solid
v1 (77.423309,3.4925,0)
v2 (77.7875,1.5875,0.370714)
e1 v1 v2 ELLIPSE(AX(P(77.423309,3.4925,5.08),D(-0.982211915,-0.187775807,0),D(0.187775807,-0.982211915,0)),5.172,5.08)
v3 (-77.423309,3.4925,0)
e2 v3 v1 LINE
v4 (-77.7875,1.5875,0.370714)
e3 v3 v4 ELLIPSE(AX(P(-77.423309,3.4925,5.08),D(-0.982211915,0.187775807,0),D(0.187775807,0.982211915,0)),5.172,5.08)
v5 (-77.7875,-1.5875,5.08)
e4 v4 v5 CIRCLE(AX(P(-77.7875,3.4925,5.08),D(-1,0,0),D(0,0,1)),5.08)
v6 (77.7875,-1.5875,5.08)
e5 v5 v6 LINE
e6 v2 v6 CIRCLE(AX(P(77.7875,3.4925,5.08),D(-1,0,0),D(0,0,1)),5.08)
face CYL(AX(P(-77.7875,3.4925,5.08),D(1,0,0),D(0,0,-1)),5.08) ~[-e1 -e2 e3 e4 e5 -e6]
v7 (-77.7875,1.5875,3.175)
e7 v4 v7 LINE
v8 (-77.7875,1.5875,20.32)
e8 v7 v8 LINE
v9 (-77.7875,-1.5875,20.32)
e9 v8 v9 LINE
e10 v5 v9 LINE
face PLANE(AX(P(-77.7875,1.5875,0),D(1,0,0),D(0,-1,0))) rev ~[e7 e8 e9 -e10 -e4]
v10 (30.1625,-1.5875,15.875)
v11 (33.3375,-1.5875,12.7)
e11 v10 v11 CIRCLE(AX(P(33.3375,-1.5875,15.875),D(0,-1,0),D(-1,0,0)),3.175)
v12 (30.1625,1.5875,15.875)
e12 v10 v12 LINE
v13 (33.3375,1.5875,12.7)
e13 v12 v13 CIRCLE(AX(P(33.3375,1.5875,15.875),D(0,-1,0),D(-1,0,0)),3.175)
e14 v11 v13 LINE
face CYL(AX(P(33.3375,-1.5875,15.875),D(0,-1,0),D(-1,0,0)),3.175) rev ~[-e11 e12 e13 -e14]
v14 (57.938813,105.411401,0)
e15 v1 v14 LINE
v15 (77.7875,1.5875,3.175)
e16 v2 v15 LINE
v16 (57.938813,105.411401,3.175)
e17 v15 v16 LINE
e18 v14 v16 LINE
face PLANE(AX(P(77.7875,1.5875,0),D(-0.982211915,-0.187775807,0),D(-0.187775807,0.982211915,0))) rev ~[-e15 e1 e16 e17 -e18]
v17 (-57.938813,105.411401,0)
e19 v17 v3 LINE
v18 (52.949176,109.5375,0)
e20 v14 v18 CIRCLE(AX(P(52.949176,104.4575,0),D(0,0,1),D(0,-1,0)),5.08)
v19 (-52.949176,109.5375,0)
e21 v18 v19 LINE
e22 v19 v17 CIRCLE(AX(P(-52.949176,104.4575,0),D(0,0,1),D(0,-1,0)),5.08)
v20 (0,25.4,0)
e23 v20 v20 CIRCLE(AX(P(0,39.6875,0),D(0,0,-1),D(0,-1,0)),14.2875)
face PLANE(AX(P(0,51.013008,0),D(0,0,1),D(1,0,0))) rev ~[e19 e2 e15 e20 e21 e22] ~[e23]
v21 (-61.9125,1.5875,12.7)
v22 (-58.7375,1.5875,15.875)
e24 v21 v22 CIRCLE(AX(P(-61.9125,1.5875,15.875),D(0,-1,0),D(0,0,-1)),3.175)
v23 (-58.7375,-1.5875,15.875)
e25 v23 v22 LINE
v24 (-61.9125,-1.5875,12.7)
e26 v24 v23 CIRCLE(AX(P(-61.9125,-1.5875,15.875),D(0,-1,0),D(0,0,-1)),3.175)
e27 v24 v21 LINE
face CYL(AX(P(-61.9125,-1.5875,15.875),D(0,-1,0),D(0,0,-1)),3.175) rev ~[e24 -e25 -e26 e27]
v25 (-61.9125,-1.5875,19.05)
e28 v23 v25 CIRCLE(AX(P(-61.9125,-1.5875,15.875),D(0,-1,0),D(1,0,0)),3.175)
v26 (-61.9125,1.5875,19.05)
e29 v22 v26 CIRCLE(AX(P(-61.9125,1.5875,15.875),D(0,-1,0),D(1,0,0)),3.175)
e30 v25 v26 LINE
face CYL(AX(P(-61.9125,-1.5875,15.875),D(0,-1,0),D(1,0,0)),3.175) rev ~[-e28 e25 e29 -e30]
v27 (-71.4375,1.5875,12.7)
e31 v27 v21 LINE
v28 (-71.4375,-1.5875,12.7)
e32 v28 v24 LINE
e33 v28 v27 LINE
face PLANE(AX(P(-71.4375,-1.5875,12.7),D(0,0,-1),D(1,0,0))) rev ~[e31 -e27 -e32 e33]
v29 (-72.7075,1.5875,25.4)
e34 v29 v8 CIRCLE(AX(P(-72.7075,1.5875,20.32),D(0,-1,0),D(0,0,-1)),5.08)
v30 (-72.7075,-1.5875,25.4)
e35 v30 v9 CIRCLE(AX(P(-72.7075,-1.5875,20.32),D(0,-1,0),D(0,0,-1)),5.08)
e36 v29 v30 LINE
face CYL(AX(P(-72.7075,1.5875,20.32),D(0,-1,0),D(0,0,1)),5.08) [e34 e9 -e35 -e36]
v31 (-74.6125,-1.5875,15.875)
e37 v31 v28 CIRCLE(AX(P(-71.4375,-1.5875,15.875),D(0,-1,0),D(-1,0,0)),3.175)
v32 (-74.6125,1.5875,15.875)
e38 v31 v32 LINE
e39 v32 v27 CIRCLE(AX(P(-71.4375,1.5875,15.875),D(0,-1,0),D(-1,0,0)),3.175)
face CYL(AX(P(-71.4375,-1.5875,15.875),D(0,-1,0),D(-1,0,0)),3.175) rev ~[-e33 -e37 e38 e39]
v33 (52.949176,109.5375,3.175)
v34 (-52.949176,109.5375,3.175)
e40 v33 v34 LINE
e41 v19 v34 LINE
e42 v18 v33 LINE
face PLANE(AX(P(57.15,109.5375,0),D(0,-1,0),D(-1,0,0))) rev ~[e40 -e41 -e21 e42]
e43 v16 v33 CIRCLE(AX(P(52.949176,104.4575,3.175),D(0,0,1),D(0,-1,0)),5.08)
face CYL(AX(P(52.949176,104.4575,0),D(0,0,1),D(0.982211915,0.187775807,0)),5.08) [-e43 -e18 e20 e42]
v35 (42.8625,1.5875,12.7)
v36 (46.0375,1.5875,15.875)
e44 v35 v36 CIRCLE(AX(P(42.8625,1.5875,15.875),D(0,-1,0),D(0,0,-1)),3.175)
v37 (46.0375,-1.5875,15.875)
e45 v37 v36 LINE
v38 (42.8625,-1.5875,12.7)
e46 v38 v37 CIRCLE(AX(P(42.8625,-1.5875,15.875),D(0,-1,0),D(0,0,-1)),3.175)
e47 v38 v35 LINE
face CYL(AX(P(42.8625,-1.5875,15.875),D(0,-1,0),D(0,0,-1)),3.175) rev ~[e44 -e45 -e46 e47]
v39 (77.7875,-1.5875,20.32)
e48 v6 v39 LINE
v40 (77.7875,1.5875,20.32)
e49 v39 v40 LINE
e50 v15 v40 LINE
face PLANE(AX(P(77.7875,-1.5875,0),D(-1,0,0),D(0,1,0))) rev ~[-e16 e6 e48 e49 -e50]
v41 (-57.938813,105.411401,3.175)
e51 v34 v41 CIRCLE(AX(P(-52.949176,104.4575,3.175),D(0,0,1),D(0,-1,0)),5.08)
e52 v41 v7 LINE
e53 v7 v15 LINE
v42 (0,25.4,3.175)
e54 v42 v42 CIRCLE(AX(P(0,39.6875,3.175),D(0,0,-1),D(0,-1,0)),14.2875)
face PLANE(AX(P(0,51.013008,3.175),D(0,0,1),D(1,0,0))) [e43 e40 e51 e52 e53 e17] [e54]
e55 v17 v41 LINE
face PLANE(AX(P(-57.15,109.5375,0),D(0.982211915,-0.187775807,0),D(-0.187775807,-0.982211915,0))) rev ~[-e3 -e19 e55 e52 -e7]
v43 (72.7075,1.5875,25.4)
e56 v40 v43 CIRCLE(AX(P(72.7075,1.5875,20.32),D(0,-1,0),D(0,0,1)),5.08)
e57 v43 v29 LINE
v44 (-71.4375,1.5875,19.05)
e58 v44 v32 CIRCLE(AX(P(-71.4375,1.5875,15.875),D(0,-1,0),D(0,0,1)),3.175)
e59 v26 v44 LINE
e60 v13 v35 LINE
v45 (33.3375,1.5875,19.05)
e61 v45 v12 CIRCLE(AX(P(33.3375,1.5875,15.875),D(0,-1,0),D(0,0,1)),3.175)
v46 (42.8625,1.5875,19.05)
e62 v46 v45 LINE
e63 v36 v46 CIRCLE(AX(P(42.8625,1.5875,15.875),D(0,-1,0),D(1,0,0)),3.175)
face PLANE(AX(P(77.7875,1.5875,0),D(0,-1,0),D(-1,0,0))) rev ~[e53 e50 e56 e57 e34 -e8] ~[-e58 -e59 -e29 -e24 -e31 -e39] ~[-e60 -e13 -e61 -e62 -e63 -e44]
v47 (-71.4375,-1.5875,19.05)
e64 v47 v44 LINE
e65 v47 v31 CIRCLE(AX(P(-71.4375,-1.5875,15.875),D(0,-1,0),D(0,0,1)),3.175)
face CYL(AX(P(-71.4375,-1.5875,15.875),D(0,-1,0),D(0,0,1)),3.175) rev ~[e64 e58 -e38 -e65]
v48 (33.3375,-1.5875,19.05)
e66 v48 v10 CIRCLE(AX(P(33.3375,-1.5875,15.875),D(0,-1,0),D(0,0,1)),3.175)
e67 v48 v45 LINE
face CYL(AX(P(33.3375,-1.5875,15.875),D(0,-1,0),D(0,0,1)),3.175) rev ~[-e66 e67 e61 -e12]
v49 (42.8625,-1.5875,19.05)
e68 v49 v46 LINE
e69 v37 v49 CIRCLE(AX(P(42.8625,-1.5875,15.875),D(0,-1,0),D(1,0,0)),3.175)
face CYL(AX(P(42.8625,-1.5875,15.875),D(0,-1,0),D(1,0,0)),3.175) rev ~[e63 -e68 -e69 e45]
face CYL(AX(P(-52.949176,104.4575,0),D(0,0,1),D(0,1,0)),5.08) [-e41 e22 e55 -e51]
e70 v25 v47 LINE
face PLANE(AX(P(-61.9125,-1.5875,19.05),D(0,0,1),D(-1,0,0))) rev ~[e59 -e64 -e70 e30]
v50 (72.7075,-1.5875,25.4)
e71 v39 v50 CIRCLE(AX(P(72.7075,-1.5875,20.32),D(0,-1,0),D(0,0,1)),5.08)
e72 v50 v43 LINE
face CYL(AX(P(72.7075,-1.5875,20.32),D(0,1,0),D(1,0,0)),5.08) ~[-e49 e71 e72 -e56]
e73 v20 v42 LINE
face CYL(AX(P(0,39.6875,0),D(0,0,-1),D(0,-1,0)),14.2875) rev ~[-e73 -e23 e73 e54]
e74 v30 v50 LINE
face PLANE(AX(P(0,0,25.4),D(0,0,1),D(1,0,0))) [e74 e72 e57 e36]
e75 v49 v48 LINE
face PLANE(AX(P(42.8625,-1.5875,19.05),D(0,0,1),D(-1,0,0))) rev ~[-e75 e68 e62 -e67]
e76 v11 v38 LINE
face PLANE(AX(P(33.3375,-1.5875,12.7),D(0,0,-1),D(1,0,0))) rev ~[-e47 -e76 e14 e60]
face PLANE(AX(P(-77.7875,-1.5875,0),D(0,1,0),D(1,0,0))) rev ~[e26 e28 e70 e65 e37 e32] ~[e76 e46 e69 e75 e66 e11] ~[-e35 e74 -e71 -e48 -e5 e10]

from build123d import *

# Parameters (mm, degrees)
F1_DEPTH = 25.4
F2_DEPTH = 3.175
F3_R     = 5.08
F5_DEPTH = 25.4


# Not quite as in the source:
# - a feature names something its author has since deleted; it is built from what else it names


with BuildPart() as f1:
    # F0 (on Top) → F1 (new body)
    with BuildSketch(Plane.XY):
        Polygon((-77.7875, -1.5875), (77.7875, -1.5875), (77.7875, 1.5875), (0, 1.5875), (-77.7875, 1.5875), align=None)
    extrude(amount=F1_DEPTH)

    # F0 (on Top) → F2 (join)
    with BuildSketch(Plane.XY):
        Polygon((0, 1.5875), (77.7875, 1.5875), (57.15, 109.5375), (0, 109.5375), (-57.15, 109.5375), (-77.7875, 1.5875), align=None)
        with BuildLine():
            ThreePointArc((14.2875, 39.6875), (10.1027881362, 29.5847118638), (0, 25.4))
            ThreePointArc((0, 25.4), (-10.1027881362, 49.7902881362), (14.2875, 39.6875))
        make_face(mode=Mode.SUBTRACT)
    extrude(amount=F2_DEPTH)

    # F3
    f3_edges = [f1.edges().sort_by_distance(p)[0] for p in [
        (-77.7875, 0, 25.4),
        (77.7875, 0, 25.4),
        (0, -1.5875, 0),
        (57.15, 109.5375, 1.5875),
        (-57.15, 109.5375, 1.5875),
    ]]
    fillet(f3_edges, radius=F3_R)

    # F4 (on face) → F5 (cut)
    with BuildSketch(Plane.XZ.offset(1.5875)):
        with BuildLine():
            ThreePointArc((-71.4375, 19.05), (-73.6825640303, 18.1200640303), (-74.6125, 15.875))
            ThreePointArc((-74.6125, 15.875), (-73.6825640303, 13.6299359697), (-71.4375, 12.7))
            Line((-71.4375, 12.7), (-61.9125, 12.7))
            ThreePointArc((-61.9125, 12.7), (-59.6674359697, 13.6299359697), (-58.7375, 15.875))
            ThreePointArc((-58.7375, 15.875), (-59.6674359697, 18.1200640303), (-61.9125, 19.05))
            Line((-61.9125, 19.05), (-71.4375, 19.05))
        make_face()
        with BuildLine():
            ThreePointArc((46.0375, 15.875), (45.1075640303, 18.1200640303), (42.8625, 19.05))
            Line((42.8625, 19.05), (33.3375, 19.05))
            ThreePointArc((33.3375, 19.05), (31.0924359697, 18.1200640303), (30.1625, 15.875))
            ThreePointArc((30.1625, 15.875), (31.0924359697, 13.6299359697), (33.3375, 12.7))
            Line((33.3375, 12.7), (42.8625, 12.7))
            ThreePointArc((42.8625, 12.7), (45.1075640303, 13.6299359697), (46.0375, 15.875))
        make_face()
    extrude(amount=-F5_DEPTH, mode=Mode.SUBTRACT)


solid = f1.part
